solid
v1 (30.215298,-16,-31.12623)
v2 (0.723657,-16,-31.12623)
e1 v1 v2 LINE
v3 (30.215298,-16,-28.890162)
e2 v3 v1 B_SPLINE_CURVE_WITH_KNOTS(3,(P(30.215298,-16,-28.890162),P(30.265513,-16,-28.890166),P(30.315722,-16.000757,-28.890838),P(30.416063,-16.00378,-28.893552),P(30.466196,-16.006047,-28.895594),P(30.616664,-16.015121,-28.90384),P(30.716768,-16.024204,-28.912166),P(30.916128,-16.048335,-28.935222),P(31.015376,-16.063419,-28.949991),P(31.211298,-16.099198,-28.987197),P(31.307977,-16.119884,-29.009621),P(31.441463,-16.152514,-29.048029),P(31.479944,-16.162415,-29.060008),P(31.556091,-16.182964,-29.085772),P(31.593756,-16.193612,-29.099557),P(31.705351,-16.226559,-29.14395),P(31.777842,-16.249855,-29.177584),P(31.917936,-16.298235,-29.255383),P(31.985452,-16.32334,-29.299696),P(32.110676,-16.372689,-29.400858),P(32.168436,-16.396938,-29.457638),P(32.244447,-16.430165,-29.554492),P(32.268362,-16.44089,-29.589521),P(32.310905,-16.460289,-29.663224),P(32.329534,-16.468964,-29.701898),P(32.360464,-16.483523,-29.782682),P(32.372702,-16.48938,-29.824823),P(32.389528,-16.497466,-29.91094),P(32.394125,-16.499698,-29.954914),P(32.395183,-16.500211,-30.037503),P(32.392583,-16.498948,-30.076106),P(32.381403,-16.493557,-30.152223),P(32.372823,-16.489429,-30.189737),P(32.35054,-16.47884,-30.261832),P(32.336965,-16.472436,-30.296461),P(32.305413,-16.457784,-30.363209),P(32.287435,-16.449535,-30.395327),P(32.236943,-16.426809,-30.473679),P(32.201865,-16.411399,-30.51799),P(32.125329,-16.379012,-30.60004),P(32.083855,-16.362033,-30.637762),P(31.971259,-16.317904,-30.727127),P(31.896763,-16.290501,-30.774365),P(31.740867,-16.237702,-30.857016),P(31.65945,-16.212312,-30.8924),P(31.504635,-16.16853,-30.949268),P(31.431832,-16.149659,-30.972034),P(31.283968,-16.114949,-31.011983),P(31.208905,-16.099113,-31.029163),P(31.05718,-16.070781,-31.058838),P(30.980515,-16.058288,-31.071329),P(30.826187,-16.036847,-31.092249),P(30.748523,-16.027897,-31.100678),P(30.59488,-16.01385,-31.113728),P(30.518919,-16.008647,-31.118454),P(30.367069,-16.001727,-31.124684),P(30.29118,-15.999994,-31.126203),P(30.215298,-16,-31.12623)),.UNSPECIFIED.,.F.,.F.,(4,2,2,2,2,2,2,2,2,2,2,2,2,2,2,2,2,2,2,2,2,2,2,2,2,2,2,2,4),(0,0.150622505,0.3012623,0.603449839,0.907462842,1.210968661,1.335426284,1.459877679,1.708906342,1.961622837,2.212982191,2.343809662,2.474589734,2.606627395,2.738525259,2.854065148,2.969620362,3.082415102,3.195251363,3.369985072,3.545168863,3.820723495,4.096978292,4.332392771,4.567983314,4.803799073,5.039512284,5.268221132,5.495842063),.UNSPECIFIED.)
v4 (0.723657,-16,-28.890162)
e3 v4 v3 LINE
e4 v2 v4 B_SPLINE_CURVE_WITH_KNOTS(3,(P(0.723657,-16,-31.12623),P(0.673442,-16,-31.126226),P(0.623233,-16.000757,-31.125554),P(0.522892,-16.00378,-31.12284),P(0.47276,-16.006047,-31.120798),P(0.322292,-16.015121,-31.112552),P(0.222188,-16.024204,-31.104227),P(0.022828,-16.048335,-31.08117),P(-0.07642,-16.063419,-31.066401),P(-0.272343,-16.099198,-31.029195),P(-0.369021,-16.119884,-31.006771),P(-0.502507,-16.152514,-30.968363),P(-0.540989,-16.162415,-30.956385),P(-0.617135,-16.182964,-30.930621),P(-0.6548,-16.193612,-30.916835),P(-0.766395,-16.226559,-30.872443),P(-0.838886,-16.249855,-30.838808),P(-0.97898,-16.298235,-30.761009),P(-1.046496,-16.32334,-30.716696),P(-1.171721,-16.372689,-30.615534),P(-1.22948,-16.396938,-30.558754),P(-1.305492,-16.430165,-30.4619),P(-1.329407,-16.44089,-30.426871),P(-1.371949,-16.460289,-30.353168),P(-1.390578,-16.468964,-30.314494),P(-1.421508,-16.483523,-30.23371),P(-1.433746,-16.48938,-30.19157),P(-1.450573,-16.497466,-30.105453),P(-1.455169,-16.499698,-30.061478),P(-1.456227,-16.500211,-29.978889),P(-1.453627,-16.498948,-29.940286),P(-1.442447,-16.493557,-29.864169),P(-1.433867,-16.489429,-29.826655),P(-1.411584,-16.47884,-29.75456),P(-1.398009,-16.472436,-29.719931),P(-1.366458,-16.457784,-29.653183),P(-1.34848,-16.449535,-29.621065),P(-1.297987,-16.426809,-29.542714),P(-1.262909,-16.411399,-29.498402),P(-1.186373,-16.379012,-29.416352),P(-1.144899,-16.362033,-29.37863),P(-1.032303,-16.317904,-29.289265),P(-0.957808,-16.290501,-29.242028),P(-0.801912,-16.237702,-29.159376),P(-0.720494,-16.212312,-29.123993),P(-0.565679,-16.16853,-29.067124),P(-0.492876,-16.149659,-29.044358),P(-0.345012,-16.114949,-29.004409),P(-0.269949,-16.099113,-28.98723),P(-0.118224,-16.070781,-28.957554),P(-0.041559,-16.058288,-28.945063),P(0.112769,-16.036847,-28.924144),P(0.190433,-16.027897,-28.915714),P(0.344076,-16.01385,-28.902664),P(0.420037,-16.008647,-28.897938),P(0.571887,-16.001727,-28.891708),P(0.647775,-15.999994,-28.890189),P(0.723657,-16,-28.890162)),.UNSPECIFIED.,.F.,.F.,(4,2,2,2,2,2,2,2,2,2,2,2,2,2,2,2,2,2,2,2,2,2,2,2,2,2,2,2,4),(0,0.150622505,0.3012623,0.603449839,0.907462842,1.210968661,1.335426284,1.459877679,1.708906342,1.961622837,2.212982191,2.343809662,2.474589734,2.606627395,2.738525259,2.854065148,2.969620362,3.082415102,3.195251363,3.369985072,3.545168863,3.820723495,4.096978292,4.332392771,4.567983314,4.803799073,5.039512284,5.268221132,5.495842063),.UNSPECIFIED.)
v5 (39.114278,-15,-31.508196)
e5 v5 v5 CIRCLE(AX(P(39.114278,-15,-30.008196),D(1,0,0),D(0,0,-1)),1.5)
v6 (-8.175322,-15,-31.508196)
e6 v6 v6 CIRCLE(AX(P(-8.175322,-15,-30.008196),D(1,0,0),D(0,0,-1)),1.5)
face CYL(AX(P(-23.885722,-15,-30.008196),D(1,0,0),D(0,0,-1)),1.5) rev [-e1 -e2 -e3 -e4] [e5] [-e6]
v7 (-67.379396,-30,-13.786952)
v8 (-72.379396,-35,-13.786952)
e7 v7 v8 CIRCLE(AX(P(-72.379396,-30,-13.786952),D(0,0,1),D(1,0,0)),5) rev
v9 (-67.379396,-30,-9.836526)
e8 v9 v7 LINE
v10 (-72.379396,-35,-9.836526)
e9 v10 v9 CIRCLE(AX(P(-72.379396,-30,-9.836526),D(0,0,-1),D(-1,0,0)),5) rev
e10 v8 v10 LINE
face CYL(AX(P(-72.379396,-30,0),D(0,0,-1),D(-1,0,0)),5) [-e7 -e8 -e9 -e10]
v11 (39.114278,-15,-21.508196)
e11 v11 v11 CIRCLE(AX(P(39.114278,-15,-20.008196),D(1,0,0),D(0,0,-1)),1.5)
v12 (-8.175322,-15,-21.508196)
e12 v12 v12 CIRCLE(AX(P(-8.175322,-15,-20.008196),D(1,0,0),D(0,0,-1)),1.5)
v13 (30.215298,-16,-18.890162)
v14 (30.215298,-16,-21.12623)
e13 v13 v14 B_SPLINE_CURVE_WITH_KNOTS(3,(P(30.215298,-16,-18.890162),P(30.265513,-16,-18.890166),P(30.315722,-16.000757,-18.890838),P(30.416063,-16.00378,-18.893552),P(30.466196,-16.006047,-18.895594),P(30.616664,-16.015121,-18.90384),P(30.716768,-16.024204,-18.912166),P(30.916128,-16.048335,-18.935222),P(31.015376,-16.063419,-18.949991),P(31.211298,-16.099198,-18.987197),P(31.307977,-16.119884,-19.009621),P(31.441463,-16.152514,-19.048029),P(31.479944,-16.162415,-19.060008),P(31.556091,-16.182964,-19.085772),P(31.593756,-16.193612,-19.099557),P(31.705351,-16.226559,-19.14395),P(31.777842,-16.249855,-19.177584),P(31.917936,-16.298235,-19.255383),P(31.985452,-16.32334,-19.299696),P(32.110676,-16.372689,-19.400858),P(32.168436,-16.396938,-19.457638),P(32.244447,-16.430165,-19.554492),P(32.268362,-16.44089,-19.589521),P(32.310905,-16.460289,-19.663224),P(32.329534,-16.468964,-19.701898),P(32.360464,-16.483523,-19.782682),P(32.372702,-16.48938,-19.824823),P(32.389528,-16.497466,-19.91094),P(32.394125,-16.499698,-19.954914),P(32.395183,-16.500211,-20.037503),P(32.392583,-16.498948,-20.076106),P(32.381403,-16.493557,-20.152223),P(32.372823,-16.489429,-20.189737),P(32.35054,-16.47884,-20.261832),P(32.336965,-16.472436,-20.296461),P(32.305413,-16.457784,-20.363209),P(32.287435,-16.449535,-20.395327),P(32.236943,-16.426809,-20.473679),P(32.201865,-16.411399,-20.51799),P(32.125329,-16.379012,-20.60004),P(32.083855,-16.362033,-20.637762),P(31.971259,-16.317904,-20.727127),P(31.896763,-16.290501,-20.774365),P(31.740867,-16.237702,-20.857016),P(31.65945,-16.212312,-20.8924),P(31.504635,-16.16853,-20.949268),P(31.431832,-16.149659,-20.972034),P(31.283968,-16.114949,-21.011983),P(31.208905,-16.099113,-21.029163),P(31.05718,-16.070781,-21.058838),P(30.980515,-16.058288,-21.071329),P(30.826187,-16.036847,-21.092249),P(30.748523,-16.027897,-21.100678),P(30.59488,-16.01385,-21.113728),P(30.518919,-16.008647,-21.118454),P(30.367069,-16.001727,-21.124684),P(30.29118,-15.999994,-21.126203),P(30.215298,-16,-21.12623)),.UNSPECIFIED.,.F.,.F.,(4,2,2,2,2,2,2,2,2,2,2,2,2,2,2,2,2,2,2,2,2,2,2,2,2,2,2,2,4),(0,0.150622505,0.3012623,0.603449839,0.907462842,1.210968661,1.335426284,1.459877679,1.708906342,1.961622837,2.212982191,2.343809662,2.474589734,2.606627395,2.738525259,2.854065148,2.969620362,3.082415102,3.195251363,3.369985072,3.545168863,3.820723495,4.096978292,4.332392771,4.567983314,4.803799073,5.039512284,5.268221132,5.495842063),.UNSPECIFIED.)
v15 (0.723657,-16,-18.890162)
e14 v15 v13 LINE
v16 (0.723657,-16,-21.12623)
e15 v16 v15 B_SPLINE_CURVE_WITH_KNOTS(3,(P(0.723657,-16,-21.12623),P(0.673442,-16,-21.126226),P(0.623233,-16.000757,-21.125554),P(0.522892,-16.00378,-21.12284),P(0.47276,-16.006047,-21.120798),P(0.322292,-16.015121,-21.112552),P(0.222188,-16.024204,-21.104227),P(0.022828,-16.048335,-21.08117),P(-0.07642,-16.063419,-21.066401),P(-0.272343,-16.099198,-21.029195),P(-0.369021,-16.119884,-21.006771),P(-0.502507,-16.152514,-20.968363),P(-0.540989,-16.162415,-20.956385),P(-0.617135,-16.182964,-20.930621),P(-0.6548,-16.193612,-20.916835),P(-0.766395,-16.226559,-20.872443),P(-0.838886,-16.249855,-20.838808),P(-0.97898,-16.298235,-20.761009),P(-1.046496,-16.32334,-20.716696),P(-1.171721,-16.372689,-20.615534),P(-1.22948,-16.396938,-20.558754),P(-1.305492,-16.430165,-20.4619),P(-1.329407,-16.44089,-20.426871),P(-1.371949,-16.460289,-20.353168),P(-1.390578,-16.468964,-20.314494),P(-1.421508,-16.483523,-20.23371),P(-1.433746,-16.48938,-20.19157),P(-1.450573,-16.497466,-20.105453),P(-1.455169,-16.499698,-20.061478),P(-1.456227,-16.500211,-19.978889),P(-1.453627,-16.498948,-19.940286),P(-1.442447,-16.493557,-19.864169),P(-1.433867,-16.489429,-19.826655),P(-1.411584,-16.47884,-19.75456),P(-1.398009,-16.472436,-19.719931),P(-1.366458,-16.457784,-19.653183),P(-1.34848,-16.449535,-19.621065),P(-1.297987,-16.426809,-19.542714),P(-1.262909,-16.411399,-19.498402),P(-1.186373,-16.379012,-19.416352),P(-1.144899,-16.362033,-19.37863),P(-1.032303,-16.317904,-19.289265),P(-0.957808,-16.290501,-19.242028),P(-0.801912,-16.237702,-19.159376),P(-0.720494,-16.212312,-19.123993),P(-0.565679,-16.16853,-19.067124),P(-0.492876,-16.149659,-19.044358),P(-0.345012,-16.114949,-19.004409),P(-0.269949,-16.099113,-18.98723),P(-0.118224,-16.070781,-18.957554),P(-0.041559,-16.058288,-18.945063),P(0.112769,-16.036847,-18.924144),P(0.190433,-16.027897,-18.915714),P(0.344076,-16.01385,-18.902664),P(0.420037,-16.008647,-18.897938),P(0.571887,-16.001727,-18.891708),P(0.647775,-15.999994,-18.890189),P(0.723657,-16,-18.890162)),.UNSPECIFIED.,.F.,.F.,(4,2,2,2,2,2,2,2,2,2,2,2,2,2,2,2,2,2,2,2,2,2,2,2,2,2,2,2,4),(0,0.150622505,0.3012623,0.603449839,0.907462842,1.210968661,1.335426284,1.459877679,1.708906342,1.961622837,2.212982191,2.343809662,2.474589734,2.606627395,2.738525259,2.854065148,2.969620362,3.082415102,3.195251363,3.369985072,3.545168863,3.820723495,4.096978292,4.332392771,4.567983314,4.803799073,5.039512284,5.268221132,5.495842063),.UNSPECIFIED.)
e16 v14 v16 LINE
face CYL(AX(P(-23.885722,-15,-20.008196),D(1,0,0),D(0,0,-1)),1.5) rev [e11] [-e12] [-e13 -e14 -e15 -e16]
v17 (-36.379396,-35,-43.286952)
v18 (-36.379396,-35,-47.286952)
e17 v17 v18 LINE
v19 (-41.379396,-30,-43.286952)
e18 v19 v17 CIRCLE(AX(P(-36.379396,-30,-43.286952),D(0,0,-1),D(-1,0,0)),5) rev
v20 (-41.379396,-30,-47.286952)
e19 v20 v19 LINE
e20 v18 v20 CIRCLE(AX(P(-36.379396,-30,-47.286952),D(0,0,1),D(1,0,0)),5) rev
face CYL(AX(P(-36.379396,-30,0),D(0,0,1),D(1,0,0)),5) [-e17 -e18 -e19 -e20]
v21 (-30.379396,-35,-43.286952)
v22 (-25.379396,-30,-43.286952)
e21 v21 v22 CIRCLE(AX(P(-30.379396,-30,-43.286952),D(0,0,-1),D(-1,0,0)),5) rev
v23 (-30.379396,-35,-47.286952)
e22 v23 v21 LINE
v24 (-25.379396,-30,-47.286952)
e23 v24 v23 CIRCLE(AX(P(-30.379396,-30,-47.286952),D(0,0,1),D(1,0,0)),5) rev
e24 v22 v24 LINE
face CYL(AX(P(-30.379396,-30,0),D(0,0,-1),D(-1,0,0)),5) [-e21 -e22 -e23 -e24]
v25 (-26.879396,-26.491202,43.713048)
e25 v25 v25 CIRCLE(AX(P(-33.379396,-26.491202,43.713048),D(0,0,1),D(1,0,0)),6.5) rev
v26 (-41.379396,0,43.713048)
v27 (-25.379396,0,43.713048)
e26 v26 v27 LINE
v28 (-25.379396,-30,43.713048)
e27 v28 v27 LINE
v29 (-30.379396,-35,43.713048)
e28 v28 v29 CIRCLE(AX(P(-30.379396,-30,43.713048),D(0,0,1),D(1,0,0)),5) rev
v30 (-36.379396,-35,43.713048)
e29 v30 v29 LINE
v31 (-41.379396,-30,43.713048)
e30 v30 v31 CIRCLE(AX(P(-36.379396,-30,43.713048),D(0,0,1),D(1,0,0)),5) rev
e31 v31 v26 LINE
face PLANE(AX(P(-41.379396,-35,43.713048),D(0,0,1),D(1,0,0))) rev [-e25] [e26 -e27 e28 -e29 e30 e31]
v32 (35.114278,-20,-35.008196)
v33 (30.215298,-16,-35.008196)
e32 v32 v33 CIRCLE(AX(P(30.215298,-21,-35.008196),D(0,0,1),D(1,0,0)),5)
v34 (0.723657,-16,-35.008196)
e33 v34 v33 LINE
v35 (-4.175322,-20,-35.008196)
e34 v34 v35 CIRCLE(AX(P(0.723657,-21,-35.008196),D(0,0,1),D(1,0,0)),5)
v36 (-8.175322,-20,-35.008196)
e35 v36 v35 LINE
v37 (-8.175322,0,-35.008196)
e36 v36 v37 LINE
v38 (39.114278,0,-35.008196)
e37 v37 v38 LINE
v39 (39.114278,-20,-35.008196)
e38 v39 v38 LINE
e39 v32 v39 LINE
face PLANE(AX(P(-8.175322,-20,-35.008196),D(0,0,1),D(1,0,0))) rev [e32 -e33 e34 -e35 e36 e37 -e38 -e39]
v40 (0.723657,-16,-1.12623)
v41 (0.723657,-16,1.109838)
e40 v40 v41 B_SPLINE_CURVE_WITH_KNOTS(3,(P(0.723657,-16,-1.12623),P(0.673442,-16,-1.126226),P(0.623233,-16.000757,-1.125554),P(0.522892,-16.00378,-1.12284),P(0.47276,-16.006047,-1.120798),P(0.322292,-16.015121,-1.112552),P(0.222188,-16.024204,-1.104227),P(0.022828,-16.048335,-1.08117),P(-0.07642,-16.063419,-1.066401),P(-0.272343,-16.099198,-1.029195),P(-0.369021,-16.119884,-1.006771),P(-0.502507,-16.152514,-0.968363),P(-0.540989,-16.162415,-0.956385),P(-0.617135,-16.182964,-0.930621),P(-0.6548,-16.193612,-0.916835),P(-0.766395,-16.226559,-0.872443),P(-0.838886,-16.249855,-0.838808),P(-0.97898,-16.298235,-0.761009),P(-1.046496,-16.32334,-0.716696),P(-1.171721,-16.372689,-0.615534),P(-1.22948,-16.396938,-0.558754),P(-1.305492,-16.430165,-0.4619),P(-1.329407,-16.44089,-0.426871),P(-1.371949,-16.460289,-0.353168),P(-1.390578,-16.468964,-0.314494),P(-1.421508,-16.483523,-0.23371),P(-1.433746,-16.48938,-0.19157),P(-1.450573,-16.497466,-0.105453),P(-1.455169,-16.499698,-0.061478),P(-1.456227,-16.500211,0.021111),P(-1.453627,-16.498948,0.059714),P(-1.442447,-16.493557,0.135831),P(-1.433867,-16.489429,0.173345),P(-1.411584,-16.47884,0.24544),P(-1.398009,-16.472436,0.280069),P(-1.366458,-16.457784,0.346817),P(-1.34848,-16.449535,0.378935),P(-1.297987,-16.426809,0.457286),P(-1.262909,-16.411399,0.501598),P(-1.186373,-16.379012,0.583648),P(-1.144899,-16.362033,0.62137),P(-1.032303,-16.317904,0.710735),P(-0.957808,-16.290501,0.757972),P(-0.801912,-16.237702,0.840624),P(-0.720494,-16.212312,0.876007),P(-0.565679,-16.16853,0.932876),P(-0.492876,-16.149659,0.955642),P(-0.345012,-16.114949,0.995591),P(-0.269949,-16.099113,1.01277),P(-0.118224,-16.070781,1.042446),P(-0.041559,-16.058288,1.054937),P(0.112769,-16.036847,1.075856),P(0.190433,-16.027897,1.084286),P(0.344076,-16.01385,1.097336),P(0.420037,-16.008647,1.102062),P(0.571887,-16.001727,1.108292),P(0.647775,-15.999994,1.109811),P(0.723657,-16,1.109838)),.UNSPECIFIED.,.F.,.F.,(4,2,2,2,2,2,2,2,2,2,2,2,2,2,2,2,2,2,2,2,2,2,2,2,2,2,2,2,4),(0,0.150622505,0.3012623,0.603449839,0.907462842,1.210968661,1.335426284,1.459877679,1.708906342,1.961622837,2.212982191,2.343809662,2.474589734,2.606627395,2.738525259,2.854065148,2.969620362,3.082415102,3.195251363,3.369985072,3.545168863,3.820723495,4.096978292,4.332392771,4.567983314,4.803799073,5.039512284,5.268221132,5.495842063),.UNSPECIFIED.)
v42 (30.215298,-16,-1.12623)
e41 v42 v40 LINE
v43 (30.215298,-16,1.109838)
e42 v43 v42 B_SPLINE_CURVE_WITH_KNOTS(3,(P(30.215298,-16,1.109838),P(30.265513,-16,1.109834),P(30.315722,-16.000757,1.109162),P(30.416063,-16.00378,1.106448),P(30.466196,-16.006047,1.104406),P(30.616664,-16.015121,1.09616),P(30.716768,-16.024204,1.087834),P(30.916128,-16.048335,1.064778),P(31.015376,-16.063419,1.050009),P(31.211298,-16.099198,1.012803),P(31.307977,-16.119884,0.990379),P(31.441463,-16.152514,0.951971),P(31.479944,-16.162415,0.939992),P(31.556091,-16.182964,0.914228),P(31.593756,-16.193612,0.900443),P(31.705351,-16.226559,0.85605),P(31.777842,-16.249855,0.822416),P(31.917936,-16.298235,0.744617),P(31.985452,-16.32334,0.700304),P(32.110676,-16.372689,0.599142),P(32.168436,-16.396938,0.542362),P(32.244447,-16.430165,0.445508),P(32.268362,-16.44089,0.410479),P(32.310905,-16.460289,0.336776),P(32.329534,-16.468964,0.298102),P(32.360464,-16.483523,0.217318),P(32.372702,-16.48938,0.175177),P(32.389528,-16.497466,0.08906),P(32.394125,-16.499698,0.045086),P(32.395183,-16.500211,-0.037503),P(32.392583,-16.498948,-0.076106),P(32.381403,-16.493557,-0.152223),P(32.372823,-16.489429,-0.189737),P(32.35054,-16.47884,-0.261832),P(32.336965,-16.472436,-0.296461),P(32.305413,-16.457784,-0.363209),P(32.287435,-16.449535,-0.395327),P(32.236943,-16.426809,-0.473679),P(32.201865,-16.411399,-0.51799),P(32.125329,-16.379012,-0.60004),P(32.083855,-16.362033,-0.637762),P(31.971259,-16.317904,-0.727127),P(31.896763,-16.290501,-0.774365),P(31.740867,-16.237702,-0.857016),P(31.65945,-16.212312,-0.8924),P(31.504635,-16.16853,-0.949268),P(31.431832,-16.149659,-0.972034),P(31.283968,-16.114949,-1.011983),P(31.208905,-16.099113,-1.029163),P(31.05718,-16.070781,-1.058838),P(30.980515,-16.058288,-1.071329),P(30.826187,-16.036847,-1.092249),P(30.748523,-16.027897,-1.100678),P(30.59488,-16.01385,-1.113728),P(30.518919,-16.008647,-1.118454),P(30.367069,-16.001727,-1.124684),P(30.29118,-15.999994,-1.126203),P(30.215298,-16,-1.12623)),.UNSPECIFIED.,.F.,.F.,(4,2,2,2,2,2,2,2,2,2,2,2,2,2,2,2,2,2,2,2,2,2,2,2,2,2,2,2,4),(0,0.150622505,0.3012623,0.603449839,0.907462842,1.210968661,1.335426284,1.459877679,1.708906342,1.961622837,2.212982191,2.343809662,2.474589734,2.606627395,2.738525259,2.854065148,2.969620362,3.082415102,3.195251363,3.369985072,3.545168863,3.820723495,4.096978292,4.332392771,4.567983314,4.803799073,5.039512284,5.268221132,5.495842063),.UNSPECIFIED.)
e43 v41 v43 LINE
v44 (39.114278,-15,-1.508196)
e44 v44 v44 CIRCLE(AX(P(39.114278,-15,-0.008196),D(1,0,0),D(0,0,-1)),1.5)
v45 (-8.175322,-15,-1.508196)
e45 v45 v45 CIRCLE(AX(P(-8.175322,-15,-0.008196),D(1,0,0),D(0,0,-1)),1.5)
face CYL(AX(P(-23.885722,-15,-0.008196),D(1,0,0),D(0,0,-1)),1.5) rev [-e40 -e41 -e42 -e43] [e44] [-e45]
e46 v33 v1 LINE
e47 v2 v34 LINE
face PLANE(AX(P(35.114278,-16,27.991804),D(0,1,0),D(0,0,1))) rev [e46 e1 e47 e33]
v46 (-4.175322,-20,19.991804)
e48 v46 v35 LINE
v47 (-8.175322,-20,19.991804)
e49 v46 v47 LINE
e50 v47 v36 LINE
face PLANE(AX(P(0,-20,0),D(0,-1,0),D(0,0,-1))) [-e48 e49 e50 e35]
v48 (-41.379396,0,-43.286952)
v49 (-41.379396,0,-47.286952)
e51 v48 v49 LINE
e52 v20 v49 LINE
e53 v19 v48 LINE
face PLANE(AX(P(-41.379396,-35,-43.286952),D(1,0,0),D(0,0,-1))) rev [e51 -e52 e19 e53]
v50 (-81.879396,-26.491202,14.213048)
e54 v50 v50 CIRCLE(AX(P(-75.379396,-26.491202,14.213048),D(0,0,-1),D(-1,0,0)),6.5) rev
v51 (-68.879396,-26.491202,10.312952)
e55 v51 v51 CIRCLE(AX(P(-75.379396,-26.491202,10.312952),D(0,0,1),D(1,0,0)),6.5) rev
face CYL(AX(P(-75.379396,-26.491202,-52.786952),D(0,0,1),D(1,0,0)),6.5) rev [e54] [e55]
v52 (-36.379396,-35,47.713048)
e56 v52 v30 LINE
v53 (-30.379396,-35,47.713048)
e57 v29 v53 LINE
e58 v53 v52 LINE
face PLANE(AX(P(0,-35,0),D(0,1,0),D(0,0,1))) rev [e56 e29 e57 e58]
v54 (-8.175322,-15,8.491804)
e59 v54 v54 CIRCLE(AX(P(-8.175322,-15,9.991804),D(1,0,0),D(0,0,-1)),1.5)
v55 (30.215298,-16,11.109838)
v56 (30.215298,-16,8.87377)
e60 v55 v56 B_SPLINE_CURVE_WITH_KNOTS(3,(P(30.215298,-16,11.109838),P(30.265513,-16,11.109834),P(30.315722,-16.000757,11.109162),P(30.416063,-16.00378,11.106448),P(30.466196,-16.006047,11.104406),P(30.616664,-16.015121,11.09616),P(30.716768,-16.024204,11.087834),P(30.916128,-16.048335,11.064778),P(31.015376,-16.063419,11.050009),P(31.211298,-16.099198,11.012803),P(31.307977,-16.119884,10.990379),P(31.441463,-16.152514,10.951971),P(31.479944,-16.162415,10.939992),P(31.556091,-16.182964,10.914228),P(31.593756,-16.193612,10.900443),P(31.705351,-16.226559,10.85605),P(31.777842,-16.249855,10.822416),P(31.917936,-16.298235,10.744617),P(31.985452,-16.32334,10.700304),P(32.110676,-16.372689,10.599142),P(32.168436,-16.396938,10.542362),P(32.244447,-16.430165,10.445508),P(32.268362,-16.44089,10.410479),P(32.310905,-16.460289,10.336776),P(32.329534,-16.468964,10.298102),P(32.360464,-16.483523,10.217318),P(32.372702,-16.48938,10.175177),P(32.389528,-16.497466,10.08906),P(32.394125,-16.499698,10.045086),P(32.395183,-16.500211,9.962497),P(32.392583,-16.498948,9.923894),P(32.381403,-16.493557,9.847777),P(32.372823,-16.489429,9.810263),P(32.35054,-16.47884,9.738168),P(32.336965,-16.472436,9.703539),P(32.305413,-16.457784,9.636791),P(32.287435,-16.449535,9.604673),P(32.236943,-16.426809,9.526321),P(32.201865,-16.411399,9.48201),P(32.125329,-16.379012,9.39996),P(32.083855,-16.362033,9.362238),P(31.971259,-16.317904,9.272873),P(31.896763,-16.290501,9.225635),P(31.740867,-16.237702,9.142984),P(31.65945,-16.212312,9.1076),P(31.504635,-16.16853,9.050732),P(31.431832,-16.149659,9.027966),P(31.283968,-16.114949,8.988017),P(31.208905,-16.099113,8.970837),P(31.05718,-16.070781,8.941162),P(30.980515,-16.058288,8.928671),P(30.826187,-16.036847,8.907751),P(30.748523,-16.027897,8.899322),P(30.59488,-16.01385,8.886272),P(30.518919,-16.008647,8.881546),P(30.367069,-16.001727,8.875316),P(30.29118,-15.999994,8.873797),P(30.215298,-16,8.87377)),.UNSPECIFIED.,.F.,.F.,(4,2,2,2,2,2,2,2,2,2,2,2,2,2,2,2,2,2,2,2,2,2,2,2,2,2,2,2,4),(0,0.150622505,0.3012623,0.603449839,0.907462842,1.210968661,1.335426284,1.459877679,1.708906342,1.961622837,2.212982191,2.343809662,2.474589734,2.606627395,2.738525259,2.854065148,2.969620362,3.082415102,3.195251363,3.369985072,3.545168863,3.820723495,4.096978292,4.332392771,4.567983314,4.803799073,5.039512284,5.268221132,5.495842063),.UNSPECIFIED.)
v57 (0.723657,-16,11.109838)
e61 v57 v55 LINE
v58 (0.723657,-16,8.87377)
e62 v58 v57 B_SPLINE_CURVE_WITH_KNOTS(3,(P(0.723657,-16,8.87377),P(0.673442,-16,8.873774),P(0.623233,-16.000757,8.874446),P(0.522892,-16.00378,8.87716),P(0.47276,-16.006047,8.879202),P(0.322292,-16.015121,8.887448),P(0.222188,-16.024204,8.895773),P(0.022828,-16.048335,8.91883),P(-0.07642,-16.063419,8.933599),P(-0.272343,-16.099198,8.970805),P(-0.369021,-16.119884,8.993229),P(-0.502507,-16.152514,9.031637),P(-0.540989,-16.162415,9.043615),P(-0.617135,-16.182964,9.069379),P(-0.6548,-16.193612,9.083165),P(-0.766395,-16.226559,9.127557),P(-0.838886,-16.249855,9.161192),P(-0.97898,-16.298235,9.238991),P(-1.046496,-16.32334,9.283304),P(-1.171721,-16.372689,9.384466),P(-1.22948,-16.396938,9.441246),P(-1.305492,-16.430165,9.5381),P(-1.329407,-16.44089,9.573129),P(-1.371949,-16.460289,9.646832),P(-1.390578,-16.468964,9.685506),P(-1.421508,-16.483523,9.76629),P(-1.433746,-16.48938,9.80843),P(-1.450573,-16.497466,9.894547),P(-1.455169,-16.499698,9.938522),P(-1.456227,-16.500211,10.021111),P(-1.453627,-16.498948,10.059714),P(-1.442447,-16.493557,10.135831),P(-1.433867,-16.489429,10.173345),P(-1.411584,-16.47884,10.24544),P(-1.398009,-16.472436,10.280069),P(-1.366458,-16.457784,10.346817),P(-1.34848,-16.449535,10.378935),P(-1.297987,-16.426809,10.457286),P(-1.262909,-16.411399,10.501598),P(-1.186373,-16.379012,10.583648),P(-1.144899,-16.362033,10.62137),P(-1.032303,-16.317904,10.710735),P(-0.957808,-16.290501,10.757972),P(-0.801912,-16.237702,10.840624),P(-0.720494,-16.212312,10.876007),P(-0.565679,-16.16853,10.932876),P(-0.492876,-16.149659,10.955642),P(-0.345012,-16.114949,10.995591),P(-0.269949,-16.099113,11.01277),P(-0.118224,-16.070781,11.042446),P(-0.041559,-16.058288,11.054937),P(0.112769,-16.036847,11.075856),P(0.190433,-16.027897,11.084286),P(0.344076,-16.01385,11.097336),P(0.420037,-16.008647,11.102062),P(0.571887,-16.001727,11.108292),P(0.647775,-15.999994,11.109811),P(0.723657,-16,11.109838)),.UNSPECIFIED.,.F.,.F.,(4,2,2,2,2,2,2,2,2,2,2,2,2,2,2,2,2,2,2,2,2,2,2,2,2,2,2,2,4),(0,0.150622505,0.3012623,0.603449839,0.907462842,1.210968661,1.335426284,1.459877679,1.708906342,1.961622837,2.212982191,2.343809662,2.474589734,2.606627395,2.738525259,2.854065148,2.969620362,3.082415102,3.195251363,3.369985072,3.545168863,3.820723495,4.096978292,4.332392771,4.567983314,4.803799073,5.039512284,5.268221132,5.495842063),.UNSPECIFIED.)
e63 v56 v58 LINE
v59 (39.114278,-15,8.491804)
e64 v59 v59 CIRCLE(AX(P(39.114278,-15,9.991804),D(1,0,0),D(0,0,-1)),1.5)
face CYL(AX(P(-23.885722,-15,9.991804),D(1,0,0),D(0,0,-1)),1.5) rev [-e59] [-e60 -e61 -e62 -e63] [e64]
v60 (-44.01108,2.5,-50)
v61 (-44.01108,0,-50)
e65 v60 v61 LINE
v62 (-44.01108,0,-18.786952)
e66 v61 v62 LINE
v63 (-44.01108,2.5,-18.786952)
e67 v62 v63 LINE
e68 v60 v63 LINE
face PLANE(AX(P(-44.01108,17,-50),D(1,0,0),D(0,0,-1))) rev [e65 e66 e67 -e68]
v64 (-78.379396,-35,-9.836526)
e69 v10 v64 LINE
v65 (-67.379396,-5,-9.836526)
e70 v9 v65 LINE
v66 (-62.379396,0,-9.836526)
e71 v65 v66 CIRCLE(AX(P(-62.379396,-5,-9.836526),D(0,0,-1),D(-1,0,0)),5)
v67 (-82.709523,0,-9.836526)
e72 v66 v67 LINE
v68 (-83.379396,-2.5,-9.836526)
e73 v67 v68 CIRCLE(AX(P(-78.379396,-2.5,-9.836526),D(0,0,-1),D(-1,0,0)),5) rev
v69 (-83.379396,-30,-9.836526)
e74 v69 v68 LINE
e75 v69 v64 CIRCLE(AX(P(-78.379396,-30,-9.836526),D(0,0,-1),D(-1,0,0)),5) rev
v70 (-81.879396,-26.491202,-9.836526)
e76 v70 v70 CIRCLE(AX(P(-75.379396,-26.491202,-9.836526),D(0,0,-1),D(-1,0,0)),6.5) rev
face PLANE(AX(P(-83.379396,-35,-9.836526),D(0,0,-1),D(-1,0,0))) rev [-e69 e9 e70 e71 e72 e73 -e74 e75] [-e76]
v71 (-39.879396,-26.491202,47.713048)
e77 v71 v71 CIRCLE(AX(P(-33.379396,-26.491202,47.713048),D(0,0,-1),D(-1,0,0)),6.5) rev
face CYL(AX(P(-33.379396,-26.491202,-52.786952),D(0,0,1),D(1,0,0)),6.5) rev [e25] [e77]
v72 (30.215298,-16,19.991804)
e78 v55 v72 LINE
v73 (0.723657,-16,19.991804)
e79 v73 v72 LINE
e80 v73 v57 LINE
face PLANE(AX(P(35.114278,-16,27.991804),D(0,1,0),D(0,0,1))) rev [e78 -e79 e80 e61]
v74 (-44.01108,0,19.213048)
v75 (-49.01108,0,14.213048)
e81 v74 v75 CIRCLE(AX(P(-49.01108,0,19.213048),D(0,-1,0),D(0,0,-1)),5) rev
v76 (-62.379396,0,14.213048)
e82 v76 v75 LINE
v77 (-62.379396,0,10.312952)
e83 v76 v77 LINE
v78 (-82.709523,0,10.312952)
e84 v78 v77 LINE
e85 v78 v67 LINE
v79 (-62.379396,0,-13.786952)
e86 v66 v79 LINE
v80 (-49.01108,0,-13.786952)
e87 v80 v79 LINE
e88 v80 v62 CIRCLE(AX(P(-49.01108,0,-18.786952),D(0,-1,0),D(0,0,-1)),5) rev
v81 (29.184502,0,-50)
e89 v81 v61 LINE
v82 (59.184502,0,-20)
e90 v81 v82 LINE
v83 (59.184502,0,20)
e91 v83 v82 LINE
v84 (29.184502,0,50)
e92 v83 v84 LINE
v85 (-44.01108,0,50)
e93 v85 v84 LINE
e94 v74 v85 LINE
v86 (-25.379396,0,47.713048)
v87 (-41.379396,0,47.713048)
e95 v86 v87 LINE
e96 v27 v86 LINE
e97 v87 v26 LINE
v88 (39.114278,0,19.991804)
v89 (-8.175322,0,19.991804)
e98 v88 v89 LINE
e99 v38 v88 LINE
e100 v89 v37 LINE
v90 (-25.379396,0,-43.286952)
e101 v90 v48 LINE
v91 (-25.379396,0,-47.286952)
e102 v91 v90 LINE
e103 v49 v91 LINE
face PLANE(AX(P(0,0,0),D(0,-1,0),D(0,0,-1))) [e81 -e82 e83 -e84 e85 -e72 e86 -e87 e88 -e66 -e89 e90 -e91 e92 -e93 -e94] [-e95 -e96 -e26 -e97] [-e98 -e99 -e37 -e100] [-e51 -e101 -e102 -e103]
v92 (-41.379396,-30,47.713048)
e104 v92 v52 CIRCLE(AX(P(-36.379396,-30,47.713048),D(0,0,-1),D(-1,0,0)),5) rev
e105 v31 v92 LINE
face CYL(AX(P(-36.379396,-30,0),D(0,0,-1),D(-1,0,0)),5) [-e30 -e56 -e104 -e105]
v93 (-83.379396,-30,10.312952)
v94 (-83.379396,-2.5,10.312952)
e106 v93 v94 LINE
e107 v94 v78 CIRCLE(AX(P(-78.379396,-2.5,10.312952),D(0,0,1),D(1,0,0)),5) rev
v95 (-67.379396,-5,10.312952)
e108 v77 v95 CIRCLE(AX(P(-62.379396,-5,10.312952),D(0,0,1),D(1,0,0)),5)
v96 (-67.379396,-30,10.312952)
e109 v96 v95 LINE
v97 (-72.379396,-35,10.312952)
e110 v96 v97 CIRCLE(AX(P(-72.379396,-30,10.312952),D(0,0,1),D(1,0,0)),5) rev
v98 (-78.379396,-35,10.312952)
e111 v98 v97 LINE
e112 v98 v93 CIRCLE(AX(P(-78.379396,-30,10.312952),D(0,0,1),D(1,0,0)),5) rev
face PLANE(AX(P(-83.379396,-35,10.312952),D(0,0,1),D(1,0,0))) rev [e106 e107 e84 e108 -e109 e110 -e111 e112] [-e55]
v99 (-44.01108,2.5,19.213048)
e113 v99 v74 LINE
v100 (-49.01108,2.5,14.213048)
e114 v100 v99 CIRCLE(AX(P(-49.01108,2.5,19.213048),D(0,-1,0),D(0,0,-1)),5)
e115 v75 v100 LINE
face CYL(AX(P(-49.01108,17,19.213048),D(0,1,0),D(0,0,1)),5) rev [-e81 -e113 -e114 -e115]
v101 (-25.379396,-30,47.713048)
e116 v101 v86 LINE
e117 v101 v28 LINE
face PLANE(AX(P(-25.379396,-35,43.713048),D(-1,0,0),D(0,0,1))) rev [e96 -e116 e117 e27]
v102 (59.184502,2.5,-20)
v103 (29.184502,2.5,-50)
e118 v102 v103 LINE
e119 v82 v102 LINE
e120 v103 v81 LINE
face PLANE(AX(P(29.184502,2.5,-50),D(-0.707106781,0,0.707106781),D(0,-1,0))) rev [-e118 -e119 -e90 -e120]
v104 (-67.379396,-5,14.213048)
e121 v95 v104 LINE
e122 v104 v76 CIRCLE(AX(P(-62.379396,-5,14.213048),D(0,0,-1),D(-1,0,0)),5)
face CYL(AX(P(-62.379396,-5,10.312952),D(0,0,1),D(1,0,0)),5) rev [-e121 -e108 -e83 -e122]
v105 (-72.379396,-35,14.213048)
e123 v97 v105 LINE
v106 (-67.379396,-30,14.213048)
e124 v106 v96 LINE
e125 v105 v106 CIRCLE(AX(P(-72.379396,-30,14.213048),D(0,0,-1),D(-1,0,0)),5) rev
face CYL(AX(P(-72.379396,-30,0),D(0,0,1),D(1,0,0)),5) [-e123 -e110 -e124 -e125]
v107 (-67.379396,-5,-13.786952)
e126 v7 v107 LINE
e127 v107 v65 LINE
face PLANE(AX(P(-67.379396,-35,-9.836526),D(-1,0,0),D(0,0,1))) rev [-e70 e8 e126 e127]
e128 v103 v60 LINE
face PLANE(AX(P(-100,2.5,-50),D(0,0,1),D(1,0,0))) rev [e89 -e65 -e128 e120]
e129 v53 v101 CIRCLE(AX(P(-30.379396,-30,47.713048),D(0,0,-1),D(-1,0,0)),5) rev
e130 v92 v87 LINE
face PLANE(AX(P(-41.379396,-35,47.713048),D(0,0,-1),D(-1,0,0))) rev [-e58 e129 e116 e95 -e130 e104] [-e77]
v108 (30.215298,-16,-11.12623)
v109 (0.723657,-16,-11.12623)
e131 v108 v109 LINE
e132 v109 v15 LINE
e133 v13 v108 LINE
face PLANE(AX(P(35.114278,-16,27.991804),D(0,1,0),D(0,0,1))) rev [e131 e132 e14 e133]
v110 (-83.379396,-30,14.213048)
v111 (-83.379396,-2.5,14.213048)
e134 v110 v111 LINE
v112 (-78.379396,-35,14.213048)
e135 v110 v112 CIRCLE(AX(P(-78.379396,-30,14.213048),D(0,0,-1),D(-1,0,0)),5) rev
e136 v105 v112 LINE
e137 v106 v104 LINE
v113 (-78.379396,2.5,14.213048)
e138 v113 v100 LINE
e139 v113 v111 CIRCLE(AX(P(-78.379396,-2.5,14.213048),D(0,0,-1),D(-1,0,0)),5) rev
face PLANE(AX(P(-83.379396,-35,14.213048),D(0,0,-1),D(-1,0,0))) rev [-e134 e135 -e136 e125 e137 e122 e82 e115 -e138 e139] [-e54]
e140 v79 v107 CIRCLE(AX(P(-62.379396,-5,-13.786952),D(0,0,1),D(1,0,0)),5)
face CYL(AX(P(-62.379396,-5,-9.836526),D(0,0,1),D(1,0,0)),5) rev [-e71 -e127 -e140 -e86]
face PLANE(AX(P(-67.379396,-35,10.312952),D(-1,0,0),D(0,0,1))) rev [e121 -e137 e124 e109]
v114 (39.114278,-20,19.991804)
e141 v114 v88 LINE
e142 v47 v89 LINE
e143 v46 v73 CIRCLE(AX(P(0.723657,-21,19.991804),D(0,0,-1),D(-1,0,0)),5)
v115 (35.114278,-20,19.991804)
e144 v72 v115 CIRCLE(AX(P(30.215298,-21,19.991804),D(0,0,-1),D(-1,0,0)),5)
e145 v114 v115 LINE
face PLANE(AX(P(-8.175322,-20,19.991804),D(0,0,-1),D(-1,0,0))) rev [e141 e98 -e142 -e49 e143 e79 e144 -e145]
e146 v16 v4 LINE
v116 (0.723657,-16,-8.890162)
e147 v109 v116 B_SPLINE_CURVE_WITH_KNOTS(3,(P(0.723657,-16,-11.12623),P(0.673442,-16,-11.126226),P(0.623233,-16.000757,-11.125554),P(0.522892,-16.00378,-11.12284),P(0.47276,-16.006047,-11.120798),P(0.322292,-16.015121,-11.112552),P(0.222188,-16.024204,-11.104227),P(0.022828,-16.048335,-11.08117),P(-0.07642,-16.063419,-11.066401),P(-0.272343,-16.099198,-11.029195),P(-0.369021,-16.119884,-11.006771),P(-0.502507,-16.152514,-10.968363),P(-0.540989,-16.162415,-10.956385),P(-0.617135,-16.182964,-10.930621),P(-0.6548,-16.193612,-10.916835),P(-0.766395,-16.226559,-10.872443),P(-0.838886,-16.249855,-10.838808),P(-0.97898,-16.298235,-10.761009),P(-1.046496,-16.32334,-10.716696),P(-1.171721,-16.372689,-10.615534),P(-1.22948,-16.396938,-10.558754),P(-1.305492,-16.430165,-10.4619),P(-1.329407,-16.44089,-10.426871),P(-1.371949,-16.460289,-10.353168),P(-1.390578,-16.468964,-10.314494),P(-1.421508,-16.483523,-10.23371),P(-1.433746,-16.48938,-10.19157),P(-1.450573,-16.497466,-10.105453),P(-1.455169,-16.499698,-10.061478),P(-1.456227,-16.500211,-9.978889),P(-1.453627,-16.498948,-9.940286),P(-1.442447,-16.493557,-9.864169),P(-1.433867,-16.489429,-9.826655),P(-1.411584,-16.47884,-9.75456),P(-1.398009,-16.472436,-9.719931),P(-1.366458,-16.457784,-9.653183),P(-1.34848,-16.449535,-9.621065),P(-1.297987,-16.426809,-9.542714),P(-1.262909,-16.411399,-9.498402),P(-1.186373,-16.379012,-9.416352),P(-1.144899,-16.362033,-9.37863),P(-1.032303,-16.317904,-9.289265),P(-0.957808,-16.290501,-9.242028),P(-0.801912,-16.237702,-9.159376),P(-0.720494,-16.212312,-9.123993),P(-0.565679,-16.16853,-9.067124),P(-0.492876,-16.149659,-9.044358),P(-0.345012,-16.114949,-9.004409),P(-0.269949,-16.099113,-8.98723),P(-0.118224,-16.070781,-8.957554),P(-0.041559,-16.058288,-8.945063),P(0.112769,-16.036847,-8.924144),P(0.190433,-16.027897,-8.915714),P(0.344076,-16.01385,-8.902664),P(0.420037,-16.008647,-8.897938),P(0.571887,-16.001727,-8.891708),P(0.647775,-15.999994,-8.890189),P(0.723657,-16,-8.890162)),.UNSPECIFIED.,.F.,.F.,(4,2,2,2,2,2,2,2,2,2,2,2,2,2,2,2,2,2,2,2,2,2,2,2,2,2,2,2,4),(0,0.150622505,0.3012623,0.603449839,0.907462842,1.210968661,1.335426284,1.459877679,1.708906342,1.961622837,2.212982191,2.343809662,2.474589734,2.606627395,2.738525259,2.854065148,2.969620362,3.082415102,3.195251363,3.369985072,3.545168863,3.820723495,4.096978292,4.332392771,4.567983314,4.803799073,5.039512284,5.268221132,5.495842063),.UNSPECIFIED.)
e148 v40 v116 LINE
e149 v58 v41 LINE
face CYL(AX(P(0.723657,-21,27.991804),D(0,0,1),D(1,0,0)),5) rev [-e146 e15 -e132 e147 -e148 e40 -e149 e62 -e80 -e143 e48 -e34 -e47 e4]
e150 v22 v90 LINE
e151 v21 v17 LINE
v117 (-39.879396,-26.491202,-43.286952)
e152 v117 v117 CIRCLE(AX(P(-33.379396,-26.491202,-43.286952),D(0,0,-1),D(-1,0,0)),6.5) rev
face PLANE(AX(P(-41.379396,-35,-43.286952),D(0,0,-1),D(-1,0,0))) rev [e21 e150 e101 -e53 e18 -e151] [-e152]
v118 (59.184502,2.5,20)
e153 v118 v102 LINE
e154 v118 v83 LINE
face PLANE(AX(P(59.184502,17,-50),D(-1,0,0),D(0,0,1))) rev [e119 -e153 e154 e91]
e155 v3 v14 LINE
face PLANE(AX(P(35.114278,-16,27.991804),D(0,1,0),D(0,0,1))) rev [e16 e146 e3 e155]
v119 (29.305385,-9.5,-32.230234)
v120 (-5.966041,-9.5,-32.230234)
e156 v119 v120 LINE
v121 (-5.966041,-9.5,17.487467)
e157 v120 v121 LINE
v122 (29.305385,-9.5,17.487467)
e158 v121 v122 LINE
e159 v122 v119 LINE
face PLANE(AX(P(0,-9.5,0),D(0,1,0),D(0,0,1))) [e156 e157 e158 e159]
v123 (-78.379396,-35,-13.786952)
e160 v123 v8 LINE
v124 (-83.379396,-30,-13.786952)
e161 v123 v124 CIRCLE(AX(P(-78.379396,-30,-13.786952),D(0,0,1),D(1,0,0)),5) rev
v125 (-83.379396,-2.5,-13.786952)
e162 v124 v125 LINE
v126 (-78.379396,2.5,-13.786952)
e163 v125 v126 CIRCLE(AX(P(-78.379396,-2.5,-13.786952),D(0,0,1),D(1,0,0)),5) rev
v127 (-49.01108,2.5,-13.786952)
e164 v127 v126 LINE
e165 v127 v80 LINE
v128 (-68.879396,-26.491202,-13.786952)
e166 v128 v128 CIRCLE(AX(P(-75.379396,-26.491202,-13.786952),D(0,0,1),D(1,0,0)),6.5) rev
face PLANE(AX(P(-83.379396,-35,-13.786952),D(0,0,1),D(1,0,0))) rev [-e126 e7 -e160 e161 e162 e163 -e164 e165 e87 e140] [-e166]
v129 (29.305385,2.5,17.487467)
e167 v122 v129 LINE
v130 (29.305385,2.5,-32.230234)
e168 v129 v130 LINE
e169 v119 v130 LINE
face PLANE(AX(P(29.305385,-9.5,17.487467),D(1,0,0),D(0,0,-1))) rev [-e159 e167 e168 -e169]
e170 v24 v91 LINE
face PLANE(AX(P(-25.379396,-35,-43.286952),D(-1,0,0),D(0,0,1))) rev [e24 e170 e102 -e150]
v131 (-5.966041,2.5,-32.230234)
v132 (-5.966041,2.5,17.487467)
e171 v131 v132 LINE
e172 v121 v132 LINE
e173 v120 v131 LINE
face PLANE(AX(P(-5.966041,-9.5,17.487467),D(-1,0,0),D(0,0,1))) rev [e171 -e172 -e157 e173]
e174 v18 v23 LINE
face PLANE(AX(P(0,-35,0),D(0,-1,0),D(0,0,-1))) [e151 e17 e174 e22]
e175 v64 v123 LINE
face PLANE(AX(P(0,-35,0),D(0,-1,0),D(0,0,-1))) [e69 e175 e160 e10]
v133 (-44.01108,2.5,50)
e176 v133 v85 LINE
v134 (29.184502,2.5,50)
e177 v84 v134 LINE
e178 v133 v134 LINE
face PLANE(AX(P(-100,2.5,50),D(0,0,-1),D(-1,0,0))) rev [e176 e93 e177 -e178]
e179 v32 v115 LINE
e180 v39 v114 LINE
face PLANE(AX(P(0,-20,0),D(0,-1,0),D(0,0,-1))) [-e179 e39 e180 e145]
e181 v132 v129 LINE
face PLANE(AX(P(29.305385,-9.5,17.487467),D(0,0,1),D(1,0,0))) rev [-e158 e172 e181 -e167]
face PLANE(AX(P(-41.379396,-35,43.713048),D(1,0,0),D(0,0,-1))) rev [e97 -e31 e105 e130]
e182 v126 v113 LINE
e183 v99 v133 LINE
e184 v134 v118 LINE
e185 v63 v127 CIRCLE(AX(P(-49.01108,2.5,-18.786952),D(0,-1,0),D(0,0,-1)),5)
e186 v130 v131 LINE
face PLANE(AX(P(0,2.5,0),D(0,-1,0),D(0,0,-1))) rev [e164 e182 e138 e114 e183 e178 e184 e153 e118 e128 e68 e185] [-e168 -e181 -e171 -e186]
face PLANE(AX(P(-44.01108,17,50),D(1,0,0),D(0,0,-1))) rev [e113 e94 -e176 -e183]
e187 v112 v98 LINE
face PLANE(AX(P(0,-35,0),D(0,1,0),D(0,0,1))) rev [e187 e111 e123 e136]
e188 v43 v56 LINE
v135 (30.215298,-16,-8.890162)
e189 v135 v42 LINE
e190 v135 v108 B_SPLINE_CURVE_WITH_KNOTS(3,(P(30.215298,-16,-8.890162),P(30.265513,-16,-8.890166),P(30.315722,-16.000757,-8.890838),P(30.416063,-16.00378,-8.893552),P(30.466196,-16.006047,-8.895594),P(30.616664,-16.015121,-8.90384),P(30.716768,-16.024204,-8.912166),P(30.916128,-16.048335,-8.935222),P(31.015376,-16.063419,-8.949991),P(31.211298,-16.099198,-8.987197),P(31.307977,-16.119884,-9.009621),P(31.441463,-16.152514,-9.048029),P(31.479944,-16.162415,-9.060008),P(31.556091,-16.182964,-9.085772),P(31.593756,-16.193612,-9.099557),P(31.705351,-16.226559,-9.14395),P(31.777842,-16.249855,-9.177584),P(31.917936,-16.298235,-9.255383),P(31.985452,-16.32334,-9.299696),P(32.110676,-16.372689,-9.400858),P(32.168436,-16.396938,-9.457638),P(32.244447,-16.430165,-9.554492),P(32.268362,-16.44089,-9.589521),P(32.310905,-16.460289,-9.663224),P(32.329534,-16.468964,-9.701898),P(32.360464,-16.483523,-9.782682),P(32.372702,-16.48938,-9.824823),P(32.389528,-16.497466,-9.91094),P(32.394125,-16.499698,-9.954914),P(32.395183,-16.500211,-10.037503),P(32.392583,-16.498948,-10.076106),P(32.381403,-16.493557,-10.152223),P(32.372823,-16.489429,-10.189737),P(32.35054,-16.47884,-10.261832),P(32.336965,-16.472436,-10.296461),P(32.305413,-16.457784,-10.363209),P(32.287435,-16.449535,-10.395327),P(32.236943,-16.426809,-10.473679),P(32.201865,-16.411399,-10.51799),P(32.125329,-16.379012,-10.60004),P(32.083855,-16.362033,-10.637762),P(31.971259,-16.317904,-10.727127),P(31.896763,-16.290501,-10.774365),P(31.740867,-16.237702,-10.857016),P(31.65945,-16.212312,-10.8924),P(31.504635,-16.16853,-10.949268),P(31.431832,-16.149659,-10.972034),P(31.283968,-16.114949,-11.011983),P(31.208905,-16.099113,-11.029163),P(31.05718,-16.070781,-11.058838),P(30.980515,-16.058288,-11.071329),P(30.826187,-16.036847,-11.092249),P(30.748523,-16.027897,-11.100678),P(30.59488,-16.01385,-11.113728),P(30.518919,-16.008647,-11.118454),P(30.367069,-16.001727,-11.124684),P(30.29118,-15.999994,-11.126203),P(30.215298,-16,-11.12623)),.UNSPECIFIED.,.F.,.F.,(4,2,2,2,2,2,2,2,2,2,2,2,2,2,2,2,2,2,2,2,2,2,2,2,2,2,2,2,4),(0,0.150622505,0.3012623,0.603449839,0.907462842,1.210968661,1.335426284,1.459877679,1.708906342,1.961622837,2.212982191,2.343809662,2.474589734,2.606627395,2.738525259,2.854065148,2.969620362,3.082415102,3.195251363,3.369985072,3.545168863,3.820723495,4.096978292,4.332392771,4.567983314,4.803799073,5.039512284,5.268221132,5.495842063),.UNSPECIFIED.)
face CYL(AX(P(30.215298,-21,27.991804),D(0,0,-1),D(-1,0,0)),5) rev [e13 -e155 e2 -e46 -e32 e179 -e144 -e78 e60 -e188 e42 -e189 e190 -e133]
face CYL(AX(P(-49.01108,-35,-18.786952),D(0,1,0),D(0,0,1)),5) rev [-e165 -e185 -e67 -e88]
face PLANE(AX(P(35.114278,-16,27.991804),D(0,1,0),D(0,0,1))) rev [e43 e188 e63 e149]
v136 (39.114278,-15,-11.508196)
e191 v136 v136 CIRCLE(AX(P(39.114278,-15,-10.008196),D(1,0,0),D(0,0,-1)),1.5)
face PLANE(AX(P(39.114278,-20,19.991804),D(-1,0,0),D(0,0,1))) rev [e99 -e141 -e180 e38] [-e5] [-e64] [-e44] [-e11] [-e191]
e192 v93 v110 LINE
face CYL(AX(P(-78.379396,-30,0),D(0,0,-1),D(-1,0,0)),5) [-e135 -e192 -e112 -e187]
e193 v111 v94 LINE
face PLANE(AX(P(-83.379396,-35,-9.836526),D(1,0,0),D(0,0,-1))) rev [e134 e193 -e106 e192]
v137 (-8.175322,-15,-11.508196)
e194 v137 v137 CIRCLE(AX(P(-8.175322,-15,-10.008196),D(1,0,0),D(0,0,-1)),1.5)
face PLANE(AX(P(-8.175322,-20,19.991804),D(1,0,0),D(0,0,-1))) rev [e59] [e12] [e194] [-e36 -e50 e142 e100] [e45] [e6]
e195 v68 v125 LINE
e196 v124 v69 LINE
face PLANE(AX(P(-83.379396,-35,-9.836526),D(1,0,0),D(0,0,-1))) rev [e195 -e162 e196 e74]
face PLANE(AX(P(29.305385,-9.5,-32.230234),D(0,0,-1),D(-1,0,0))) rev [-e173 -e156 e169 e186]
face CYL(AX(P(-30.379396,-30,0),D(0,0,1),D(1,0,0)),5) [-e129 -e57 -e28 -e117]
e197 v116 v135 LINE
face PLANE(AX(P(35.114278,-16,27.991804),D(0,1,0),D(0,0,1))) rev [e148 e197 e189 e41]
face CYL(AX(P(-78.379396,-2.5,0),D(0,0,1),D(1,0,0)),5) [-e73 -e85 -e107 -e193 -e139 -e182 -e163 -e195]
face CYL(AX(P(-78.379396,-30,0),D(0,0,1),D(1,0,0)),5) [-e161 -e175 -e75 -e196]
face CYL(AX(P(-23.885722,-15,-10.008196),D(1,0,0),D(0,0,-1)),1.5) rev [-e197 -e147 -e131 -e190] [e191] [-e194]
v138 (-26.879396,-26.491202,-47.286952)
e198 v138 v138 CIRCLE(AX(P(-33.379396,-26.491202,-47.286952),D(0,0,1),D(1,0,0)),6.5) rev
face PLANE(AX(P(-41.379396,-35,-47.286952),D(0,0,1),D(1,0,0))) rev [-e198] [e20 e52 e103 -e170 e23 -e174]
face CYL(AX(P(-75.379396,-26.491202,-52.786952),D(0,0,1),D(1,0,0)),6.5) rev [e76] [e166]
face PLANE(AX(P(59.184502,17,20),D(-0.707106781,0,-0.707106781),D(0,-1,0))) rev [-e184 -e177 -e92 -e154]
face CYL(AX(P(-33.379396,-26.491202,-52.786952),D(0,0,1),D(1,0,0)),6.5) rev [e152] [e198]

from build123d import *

# Parameters (mm, degrees)
SKETCH1_W               = 200
SKETCH1_H               = 100
BOSS_EXTRUDE1_DEPTH     = 2.5
SKETCH2_W               = 16
SKETCH2_H               = 3.950426225
SKETCH2_H_2             = 3.900095421
SKETCH2_H_3             = 4
BOSS_EXTRUDE2_DEPTH     = 35
CUT_EXTRUDE1_DEPTH      = 39
CUT_EXTRUDE1_DEPTH_BACK = 67
SKETCH3_R               = 6.5
CUT_EXTRUDE2_DEPTH      = 17
FILLET1_R               = 5
SKETCH5_W               = 40.815497855
SKETCH5_H               = 100
CUT_EXTRUDE3_DEPTH      = 17
FILLET2_R               = 5
CHAMFER1_SIZE           = 30
FILLET3_R               = 5
FILLET4_R               = 5
SKETCH6_W               = 47.289599934
SKETCH6_H               = 55
BOSS_EXTRUDE3_DEPTH     = 20
SKETCH7_W               = 39.289599934
SKETCH7_H               = 4
CUT_EXTRUDE4_DEPTH      = 63
FILLET5_R               = 5
SKETCH8_R               = 1.5
CUT_EXTRUDE5_DEPTH      = 63
SKETCH9_W               = 35.271425717
SKETCH9_H               = 49.717701143
CUT_EXTRUDE6_DEPTH      = 12


with BuildPart() as part:
    # Sketch1 → Boss-Extrude1 (new body)
    with BuildSketch(Plane(origin=(0, 0, 0), x_dir=(1, 0, 0), z_dir=(0, 1, 0))):
        Rectangle(SKETCH1_W, SKETCH1_H)
    extrude(amount=BOSS_EXTRUDE1_DEPTH)

    # Sketch2 → Boss-Extrude2 (add)
    with BuildSketch(Plane(origin=(0, 0, 0), x_dir=(-1, 0, 0), z_dir=(0, -1, 0))):
        with Locations((75.379396221, 11.811738969)):
            Rectangle(SKETCH2_W, SKETCH2_H)
        with Locations((75.379396221, -12.263000209)):
            Rectangle(SKETCH2_W, SKETCH2_H_2)
        with Locations((33.379396221, 45.286952081)):
            Rectangle(SKETCH2_W, SKETCH2_H_3)
        with Locations((33.379396221, -45.713047919)):
            Rectangle(SKETCH2_W, SKETCH2_H_3)
    extrude(amount=BOSS_EXTRUDE2_DEPTH)

    # Sketch3 → Cut-Extrude1 (cut, two sides: drawn at the far end of the back side and taken through both)
    with BuildSketch(Plane(origin=(0, 0, -13.786952081), x_dir=(-1, 0, 0), z_dir=(0, 0, -1)).offset(-CUT_EXTRUDE1_DEPTH_BACK)):
        with Locations(Location((33.379396221, -26.491201538, 0), (0, 0, 180))):
            Circle(SKETCH3_R)
        with Locations(Location((75.379396221, -26.491201538, 0), (0, 0, 180))):
            Circle(SKETCH3_R)
    extrude(amount=CUT_EXTRUDE1_DEPTH + CUT_EXTRUDE1_DEPTH_BACK, mode=Mode.SUBTRACT)

    # Sketch4 → Cut-Extrude2 (cut)
    with BuildSketch(Plane(origin=(0, 0, 0), x_dir=(-1, 0, 0), z_dir=(0, -1, 0))):
        Polygon((44.011079662, 50), (100, 50), (100, 13.786952081), (100, -14.213047919), (100, -50), (44.011079662, -50), (44.011079662, -14.213047919), (83.379396221, -14.213047919), (83.379396221, 13.786952081), (44.011079662, 13.786952081), align=None)
    extrude(amount=-CUT_EXTRUDE2_DEPTH, mode=Mode.SUBTRACT)

    # Fillet1
    fillet1_edges = [part.edges().sort_by_distance(p)[0] for p in [
        (-83.379396221, -35, -11.811738968),
        (-67.379396221, -35, -11.811738968),
        (-83.379396221, -35, 12.263000209),
        (-67.379396221, -35, 12.263000209),
        (-41.379396221, -35, -45.286952081),
        (-25.379396221, -35, -45.286952081),
        (-41.379396221, -35, 45.713047919),
        (-25.379396221, -35, 45.713047919),
    ]]
    fillet(fillet1_edges, radius=FILLET1_R)

    # Sketch5 → Cut-Extrude3 (cut)
    with BuildSketch(Plane.XZ):
        with Locations((79.592251073, 0)):
            Rectangle(SKETCH5_W, SKETCH5_H)
    extrude(amount=-CUT_EXTRUDE3_DEPTH, mode=Mode.SUBTRACT)

    # Fillet2
    fillet2_edges = [part.edges().sort_by_distance(p)[0] for p in [
        (-44.011079662, 1.25, -13.786952081),
        (-44.011079662, 1.25, 14.213047919),
    ]]
    fillet(fillet2_edges, radius=FILLET2_R)

    # Chamfer1
    chamfer1_edges = [part.edges().sort_by_distance(p)[0] for p in [
        (59.184502145, 1.25, -50),
        (59.184502145, 1.25, 50),
    ]]
    chamfer(chamfer1_edges, length=CHAMFER1_SIZE)

    # Fillet3
    # the kernel refuses this fillet: 5 mm, written as the material it takes off along each edge
    with BuildSketch(Plane(origin=(-83.379396221, 2.5, -26.286952081), x_dir=(1, 0, 0), z_dir=(0, 0, 1))) as fillet3_piece_1:
        with BuildLine():
            CenterArc((FILLET3_R, -FILLET3_R), FILLET3_R, 90, 90)
            Line((0, -FILLET3_R), (0, 0))
            Line((0, 0), (FILLET3_R, 0))
        make_face()
    extrude(amount=53, mode=Mode.SUBTRACT)

    # Fillet4
    fillet4_edges = [part.edges().sort_by_distance(p)[0] for p in [
        (-67.379396221, 0, -11.811738968),
        (-67.379396221, 0, 12.263000209),
    ]]
    fillet(fillet4_edges, radius=FILLET4_R)

    # Sketch6 → Boss-Extrude3 (add)
    with BuildSketch(Plane.XZ):
        with Locations((15.469477867, -7.508196086)):
            Rectangle(SKETCH6_W, SKETCH6_H)
    extrude(amount=BOSS_EXTRUDE3_DEPTH)

    # Sketch7 → Cut-Extrude4 (cut)
    with BuildSketch(Plane(origin=(0, 0, -35.008196086), x_dir=(-1, 0, 0), z_dir=(0, 0, -1))):
        with Locations((-15.469477867, -18)):
            Rectangle(SKETCH7_W, SKETCH7_H)
    extrude(amount=-CUT_EXTRUDE4_DEPTH, mode=Mode.SUBTRACT)

    # Fillet5
    # the kernel refuses this fillet: 5 mm, written as the material it adds along each edge
    with BuildSketch(Plane(origin=(-4.1753221, -16, -35.008196086), x_dir=(1, 0, 0), z_dir=(0, 0, 1))) as fillet5_piece_1:
        with BuildLine():
            CenterArc((4.898979486, -5), FILLET5_R, 90, 78.463040967)
            Line((0, -4), (-0.09797959, -3.98))
            ThreePointArc((-0.09797959, -3.98), (-0.1, -2), (-0.1, 0))
            Line((-0.1, 0), (0, 0.1))
            Line((0, 0.1), (4.898979486, 0.1))
            Line((4.898979486, 0.1), (4.898979486, 0))
        make_face()
    extrude(amount=55)
    with BuildSketch(Plane(origin=(35.114277834, -16, -35.008196086), x_dir=(-1.570299446029318e-12, -1.0, 0), z_dir=(0, 0, 1))) as fillet5_piece_2:
        with BuildLine():
            CenterArc((5, -4.898979486), FILLET5_R, 101.536959033, 78.463040967)
            Line((0, -4.898979486), (-0.1, -4.898979486))
            Line((-0.1, -4.898979486), (-0.1, 0))
            Line((-0.1, 0), (0, 0.1))
            ThreePointArc((0, 0.1), (2, 0.1), (3.98, 0.09797959))
            Line((3.98, 0.09797959), (4, 0))
        make_face()
    extrude(amount=55)

    # Sketch8 → Cut-Extrude5 (cut)
    with BuildSketch(Plane(origin=(39.114277834, 0, 0), x_dir=(0, 0, -1), z_dir=(1, 0, 0))):
        with Locations((-9.991803914, -15)):
            Circle(SKETCH8_R)
        with Locations((10.008196086, -15)):
            Circle(SKETCH8_R)
        with Locations((0.008196086, -15)):
            Circle(SKETCH8_R)
        with Locations((20.008196086, -15)):
            Circle(SKETCH8_R)
        with Locations((30.008196086, -15)):
            Circle(SKETCH8_R)
    extrude(amount=-CUT_EXTRUDE5_DEPTH, mode=Mode.SUBTRACT)

    # Sketch9 → Cut-Extrude6 (cut)
    with BuildSketch(Plane(origin=(0, 2.5, 0), x_dir=(1, 0, 0), z_dir=(0, 1, 0))):
        with Locations((11.669671686, 7.37138384)):
            Rectangle(SKETCH9_W, SKETCH9_H)
    extrude(amount=-CUT_EXTRUDE6_DEPTH, mode=Mode.SUBTRACT)


solid = part.part
